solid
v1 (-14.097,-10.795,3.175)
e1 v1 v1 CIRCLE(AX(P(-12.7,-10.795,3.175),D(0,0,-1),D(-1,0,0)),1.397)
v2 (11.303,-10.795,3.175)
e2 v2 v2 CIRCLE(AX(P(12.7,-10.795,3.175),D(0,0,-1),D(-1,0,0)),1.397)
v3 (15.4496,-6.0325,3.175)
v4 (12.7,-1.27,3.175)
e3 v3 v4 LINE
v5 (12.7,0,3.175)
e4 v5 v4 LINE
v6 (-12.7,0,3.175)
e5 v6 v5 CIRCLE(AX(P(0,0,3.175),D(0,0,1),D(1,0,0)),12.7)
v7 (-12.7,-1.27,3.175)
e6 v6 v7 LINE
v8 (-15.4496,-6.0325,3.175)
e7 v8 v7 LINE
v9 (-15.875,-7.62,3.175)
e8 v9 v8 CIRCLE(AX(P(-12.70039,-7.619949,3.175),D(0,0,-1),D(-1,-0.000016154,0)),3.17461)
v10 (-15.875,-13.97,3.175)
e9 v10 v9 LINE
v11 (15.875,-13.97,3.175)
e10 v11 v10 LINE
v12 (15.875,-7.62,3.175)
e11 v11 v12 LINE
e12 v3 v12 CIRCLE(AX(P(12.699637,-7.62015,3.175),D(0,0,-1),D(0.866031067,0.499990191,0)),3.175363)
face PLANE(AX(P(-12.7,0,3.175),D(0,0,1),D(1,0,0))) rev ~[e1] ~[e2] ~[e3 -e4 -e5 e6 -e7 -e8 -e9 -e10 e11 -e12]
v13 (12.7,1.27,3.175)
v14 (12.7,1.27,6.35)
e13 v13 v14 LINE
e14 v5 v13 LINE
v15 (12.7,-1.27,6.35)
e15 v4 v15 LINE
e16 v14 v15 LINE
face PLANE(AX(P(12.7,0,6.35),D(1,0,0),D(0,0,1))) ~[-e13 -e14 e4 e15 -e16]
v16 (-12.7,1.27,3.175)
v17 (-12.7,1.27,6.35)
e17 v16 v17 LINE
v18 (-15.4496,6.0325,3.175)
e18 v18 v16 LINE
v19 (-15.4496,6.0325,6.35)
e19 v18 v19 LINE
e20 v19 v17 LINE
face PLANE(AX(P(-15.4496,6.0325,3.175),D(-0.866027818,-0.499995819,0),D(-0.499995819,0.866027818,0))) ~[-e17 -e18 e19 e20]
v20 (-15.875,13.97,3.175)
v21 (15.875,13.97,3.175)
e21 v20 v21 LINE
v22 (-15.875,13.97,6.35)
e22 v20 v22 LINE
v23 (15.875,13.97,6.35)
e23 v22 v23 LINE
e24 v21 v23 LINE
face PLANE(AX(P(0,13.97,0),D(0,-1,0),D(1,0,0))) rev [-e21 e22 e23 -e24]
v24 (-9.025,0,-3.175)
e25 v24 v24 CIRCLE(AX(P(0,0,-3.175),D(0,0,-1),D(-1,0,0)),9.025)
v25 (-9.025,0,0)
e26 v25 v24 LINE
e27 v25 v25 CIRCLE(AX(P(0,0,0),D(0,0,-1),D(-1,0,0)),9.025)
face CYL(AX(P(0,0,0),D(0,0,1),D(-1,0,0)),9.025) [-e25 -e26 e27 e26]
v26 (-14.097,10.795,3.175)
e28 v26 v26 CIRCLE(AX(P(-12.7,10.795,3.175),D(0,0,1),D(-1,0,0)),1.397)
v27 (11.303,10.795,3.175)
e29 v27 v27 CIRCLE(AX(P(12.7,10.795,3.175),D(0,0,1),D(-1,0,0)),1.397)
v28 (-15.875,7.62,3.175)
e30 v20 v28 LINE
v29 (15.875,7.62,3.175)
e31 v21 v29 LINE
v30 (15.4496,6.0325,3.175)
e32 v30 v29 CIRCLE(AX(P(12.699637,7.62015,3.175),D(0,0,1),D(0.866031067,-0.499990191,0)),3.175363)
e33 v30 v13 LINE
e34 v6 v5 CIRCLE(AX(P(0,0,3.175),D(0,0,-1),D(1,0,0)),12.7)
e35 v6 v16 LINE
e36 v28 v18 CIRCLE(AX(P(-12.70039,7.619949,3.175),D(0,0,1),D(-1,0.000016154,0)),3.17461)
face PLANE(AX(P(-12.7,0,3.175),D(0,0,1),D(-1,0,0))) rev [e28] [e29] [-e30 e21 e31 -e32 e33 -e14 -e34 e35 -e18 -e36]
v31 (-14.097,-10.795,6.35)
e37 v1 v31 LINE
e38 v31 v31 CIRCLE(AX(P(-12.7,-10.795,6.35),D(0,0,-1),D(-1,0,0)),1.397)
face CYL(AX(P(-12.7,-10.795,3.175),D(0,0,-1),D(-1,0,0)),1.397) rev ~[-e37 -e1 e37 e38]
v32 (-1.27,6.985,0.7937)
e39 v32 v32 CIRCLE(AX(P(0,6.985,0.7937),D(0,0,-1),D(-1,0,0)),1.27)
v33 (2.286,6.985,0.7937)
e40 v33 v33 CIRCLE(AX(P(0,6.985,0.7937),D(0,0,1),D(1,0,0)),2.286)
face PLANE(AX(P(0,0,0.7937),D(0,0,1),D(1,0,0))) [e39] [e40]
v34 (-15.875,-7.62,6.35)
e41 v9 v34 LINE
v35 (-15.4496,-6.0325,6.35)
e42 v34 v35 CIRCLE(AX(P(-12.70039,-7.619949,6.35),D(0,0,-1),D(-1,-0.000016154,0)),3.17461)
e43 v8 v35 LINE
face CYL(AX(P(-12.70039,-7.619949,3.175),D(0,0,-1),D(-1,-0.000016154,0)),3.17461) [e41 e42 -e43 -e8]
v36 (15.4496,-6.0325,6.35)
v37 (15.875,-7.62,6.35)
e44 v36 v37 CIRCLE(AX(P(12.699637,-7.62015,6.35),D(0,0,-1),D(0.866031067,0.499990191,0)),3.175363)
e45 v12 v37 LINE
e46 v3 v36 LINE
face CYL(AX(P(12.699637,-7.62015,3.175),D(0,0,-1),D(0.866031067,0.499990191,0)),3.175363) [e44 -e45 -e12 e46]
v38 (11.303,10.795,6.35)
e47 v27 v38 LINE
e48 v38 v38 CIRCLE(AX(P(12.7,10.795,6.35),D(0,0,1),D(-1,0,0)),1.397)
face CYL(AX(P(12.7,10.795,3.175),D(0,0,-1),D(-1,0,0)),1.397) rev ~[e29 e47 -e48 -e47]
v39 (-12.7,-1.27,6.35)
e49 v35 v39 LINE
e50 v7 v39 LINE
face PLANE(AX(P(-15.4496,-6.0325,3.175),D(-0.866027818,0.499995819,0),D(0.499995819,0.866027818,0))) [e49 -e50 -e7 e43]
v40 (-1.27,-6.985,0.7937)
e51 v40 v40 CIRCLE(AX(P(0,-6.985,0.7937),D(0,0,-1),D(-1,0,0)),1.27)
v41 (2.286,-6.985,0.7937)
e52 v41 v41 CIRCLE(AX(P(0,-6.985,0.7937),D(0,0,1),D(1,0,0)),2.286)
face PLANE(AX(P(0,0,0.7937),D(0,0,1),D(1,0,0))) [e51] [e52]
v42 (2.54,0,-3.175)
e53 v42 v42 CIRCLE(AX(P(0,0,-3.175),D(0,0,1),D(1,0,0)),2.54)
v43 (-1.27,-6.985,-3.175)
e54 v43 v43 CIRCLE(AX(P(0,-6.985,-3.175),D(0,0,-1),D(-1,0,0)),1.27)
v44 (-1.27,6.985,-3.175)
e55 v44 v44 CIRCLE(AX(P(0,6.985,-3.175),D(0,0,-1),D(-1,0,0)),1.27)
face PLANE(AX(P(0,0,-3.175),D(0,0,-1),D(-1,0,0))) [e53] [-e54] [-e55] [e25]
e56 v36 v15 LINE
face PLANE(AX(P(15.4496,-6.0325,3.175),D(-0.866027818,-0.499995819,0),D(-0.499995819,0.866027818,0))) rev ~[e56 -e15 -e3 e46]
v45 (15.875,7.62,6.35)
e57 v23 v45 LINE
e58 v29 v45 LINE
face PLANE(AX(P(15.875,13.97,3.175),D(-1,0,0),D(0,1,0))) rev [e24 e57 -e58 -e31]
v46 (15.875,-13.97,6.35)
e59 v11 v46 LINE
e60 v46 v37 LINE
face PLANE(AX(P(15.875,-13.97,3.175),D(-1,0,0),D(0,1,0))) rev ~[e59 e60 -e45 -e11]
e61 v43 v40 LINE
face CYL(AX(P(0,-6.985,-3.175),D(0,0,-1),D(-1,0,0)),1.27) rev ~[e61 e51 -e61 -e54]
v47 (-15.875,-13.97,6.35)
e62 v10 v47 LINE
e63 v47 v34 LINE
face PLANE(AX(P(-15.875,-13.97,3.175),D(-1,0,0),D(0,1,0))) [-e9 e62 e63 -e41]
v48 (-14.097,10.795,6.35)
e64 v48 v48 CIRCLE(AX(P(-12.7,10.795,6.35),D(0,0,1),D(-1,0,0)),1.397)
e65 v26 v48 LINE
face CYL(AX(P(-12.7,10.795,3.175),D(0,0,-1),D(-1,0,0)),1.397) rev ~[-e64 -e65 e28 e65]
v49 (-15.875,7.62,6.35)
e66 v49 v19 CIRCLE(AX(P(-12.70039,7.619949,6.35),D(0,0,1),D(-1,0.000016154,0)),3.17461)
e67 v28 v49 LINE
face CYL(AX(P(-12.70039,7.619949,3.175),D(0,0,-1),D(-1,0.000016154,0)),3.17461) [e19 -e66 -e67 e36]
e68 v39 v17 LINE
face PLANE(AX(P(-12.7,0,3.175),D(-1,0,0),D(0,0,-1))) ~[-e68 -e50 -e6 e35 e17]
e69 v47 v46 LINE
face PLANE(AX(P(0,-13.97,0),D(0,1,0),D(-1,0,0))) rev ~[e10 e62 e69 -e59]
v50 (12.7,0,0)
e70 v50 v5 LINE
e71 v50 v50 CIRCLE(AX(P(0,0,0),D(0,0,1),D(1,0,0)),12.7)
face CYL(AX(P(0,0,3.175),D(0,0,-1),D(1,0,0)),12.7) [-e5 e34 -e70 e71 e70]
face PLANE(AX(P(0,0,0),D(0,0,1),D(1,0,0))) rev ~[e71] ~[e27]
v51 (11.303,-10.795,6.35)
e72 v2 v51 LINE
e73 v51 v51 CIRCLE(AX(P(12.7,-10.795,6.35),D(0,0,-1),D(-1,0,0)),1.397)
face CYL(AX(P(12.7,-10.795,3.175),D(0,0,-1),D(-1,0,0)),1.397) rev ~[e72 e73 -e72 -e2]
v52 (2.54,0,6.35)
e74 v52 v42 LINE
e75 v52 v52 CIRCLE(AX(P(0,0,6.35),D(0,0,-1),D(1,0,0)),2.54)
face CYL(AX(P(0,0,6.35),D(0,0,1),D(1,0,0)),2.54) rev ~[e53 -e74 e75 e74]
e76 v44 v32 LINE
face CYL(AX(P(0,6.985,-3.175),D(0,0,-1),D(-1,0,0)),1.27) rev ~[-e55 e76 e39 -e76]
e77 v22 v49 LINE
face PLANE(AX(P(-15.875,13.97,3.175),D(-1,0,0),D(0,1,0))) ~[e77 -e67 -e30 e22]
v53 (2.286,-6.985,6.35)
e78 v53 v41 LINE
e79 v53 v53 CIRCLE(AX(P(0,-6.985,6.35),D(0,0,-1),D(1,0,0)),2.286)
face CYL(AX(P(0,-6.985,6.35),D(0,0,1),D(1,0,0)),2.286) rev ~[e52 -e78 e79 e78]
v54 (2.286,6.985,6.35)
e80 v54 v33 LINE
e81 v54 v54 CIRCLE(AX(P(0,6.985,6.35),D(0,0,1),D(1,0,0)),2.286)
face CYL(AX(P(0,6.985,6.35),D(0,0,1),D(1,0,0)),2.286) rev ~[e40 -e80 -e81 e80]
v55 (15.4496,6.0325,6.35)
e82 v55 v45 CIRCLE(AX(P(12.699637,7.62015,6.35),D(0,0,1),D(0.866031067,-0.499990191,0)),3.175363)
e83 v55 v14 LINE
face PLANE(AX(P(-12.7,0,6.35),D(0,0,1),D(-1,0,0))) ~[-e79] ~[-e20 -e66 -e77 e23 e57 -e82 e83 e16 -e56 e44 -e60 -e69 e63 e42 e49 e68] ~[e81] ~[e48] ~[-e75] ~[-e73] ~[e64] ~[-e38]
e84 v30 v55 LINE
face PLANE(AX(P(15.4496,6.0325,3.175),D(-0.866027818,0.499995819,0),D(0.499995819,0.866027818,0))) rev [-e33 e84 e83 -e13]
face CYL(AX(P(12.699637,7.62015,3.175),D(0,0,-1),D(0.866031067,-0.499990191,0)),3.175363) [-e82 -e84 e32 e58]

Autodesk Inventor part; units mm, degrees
ref_plane "YZ Plane" through (0, 0, 0) normal (1, 0, 0) x (0, 1, 0)
ref_plane "Work Plane1" through (0, 0, 0) normal (0, 0, 1) x (1, 0, 0)
sketch "Sketch1" plane through (0, 0, 0) normal (0, 0, 1) x (1, 0, 0)
  circle A0 centre (0, 0) radius 9.525 projected
  circle A1 centre (0, 0) radius 12.7 projected
  point P0 (0, 0)
extrude "Extrusion1" add sketch "Sketch1" along normal blind 3.175 contours A0 | A1
sketch "Sketch2" plane through (0, 0, 0) normal (0, 0, -1) x (-1, 0, 0)
  circle A0 centre (0, 0) radius 9.025
  point P0 (0, 0)
  dimension "d2" = 18.05
extrude "Extrusion2" add sketch "Sketch2" along normal blind 3.175
sketch "Sketch3" plane through (0, 0, 3.175) normal (0, 0, 1) x (1, 0, 0)
  circle A0 centre (0, 0) radius 2.54
  point P0 (0, 0)
  dimension "d5" = 5.08
extrude "Extrusion3" cut sketch "Sketch3" against normal through all
sketch "Sketch4" plane through (0, 0, 0) normal (0, 1, 0) x (-1, 0, 0)
  line L0 (12.7, 3.175) -> (-12.7, 3.175) projected
  line L1 (-12.7, 3.175) -> (12.7, 3.175)
  line L2 (12.7, 3.175) -> (12.7, 6.35)
  line L3 (12.7, 6.35) -> (-12.7, 6.35)
  line L4 (-12.7, 6.35) -> (-12.7, 3.175)
  point P0 (0, 0)
  dimension "d8" = 3.175
ref_plane "Work Plane2" through (-27.0849, -13.97, -71.335) normal (0, 1, 0) x (0, 0, 1)
extrude "Extrusion4" add sketch "Sketch4" against normal up to surface (13.97 mm away)
sketch "Sketch5" plane through (0, 0, 3.175) normal (0, 0, 1) x (1, 0, 0)
  line L0 (-12.7, 0) -> (-2.54, 0) projected
  arc A0 (2.54, 0) -> (-2.54, 0) centre (0, 0) ccw projected
  line L1 (2.54, 0) -> (12.7, 0) projected
  arc A1 (12.7, 0) -> (-12.7, 0) centre (0, 0) ccw projected
  point P0 (0, 0)
extrude "Extrusion5" add sketch "Sketch5" along normal blind 3.175
sketch "Sketch6" plane through (0, 0, 6.35) normal (0, 0, 1) x (1, 0, 0)
  circle A0 centre (0, 0) radius 1.905
  point P0 (0, 0)
extrude "Extrusion6" cut sketch "Sketch6" against normal blind 3.175
sketch "Sketch8" plane through (0, 0, 3.175) normal (0, 0, -1) x (-1, 0, 0)
  line L0 (-29.0812, -13.97) -> (27.0849, -13.97) projected
  arc A0 (-1.905, 0) -> (1.905, 0) centre (0, 0) ccw projected
  arc A1 (12.7, 0) -> (-12.7, 0) centre (0, 0) ccw projected
  line L1 (12.7, 0) -> (12.7, -13.97) projected
  line L2 (-12.7, -13.97) -> (12.7, -13.97) projected
  line L3 (-12.7, 0) -> (-12.7, -13.97) projected
  line L4 (15.875, -13.97) -> (15.875, -7.62)
  line L5 (15.4496, -6.0325) -> (12.7, -1.27)
  line L6 (12.7, 0) -> (12.7, -13.97) projected
  arc A2 (15.875, -7.62) -> (15.4496, -6.0325) centre (12.7, -7.62) ccw
  line L7 (-15.875, -13.97) -> (-15.875, -7.62)
  line L8 (-15.4496, -6.0325) -> (-12.7, -1.27)
  line L9 (-12.7, 0) -> (-12.7, -13.97) projected
  arc A3 (-15.4496, -6.0325) -> (-15.875, -7.62) centre (-12.7, -7.62) ccw
  line L10 (2.54, 0) -> (1.905, 0) projected
  arc A4 (2.54, 0) -> (-2.54, 0) centre (0, 0) ccw projected
  line L11 (-1.905, 0) -> (-2.54, 0) projected
  point P0 (0, 0)
  dimension "d21" = 3.175
  dimension "d22" = 3.175
  dimension "d23" = 6.35
  dimension "d24" = 3.175
  dimension "d25" = 3.175
  dimension "d26" = 6.35
extrude "Extrusion8" add sketch "Sketch8" against normal blind 3.175 contours L7 A3 L8 L3 L0 | L1 L5 A2 L4 L0
sketch "Sketch9" plane through (0, 0, 3.175) normal (0, 0, -1) x (-1, 0, 0)
  circle A0 centre (12.7, -10.795) radius 1.397
  circle A1 centre (-12.7, -10.795) radius 1.397
  line L0 (15.875, -13.97) -> (15.875, -7.62) projected
  line L1 (-15.875, -13.97) -> (15.875, -13.97) projected
  line L2 (-15.875, -7.62) -> (-15.875, -13.97) projected
  point P0 (0, 0)
  dimension "d29" = 3.175
  dimension "d30" = 3.175
  dimension "d31" = 2.794
  dimension "d32" = 3.175
  dimension "d33" = 3.175
extrude "Extrusion9" cut sketch "Sketch9" against normal blind 3.175
sketch "Sketch10" plane through (0, 0, 6.35) normal (0, 0, 1) x (1, 0, 0)
  circle A0 centre (0, 0) radius 2.54
  circle A1 centre (0, 6.985) radius 2.286
  circle A2 centre (0, -6.985) radius 2.286
  circle A3 centre (0, 0) radius 9.025 projected
  dimension "d36" = 5.08
  dimension "d37" = 4.572
  dimension "d38" = 4.572
  dimension "d39" = 6.985
  dimension "d40" = 6.985
extrude "Extrusion10" cut sketch "Sketch10" against normal through all contours A0
extrude "Extrusion11" cut sketch "Sketch10" against normal blind 5.5563 contours A1 A3 | A3 A1 | A3 A2 | A2 A3
sketch "Sketch11" plane through (0, 0, -3.175) normal (0, 0, -1) x (-1, 0, 0)
  circle A0 centre (0, -6.985) radius 2.286 projected
  circle A1 centre (0, 6.985) radius 2.286 projected
  circle A2 centre (0, -6.985) radius 1.27
  circle A3 centre (0, 6.985) radius 1.27
  point P0 (0, 0)
  dimension "d45" = 2.54
extrude "Extrusion12" cut sketch "Sketch11" against normal through all contours A2 | A3
mirror "Mirror1" about plane through (0, 0, 0) normal (0, 1, 0) of "Extrusion8", "Extrusion9", "Extrusion4", "Extrusion11", "Extrusion3", "Extrusion10"
sketch "Sketch12" plane through (-15.875, -13.97, 6.35) normal (0, 0, 1) x (1, 0, 0)
  circle A0 centre (15.875, 13.97) radius 2.2303
extrude "Extrusion13" cut sketch "Sketch12" against normal blind 25.4
properties part number "Cap Top Cap"
